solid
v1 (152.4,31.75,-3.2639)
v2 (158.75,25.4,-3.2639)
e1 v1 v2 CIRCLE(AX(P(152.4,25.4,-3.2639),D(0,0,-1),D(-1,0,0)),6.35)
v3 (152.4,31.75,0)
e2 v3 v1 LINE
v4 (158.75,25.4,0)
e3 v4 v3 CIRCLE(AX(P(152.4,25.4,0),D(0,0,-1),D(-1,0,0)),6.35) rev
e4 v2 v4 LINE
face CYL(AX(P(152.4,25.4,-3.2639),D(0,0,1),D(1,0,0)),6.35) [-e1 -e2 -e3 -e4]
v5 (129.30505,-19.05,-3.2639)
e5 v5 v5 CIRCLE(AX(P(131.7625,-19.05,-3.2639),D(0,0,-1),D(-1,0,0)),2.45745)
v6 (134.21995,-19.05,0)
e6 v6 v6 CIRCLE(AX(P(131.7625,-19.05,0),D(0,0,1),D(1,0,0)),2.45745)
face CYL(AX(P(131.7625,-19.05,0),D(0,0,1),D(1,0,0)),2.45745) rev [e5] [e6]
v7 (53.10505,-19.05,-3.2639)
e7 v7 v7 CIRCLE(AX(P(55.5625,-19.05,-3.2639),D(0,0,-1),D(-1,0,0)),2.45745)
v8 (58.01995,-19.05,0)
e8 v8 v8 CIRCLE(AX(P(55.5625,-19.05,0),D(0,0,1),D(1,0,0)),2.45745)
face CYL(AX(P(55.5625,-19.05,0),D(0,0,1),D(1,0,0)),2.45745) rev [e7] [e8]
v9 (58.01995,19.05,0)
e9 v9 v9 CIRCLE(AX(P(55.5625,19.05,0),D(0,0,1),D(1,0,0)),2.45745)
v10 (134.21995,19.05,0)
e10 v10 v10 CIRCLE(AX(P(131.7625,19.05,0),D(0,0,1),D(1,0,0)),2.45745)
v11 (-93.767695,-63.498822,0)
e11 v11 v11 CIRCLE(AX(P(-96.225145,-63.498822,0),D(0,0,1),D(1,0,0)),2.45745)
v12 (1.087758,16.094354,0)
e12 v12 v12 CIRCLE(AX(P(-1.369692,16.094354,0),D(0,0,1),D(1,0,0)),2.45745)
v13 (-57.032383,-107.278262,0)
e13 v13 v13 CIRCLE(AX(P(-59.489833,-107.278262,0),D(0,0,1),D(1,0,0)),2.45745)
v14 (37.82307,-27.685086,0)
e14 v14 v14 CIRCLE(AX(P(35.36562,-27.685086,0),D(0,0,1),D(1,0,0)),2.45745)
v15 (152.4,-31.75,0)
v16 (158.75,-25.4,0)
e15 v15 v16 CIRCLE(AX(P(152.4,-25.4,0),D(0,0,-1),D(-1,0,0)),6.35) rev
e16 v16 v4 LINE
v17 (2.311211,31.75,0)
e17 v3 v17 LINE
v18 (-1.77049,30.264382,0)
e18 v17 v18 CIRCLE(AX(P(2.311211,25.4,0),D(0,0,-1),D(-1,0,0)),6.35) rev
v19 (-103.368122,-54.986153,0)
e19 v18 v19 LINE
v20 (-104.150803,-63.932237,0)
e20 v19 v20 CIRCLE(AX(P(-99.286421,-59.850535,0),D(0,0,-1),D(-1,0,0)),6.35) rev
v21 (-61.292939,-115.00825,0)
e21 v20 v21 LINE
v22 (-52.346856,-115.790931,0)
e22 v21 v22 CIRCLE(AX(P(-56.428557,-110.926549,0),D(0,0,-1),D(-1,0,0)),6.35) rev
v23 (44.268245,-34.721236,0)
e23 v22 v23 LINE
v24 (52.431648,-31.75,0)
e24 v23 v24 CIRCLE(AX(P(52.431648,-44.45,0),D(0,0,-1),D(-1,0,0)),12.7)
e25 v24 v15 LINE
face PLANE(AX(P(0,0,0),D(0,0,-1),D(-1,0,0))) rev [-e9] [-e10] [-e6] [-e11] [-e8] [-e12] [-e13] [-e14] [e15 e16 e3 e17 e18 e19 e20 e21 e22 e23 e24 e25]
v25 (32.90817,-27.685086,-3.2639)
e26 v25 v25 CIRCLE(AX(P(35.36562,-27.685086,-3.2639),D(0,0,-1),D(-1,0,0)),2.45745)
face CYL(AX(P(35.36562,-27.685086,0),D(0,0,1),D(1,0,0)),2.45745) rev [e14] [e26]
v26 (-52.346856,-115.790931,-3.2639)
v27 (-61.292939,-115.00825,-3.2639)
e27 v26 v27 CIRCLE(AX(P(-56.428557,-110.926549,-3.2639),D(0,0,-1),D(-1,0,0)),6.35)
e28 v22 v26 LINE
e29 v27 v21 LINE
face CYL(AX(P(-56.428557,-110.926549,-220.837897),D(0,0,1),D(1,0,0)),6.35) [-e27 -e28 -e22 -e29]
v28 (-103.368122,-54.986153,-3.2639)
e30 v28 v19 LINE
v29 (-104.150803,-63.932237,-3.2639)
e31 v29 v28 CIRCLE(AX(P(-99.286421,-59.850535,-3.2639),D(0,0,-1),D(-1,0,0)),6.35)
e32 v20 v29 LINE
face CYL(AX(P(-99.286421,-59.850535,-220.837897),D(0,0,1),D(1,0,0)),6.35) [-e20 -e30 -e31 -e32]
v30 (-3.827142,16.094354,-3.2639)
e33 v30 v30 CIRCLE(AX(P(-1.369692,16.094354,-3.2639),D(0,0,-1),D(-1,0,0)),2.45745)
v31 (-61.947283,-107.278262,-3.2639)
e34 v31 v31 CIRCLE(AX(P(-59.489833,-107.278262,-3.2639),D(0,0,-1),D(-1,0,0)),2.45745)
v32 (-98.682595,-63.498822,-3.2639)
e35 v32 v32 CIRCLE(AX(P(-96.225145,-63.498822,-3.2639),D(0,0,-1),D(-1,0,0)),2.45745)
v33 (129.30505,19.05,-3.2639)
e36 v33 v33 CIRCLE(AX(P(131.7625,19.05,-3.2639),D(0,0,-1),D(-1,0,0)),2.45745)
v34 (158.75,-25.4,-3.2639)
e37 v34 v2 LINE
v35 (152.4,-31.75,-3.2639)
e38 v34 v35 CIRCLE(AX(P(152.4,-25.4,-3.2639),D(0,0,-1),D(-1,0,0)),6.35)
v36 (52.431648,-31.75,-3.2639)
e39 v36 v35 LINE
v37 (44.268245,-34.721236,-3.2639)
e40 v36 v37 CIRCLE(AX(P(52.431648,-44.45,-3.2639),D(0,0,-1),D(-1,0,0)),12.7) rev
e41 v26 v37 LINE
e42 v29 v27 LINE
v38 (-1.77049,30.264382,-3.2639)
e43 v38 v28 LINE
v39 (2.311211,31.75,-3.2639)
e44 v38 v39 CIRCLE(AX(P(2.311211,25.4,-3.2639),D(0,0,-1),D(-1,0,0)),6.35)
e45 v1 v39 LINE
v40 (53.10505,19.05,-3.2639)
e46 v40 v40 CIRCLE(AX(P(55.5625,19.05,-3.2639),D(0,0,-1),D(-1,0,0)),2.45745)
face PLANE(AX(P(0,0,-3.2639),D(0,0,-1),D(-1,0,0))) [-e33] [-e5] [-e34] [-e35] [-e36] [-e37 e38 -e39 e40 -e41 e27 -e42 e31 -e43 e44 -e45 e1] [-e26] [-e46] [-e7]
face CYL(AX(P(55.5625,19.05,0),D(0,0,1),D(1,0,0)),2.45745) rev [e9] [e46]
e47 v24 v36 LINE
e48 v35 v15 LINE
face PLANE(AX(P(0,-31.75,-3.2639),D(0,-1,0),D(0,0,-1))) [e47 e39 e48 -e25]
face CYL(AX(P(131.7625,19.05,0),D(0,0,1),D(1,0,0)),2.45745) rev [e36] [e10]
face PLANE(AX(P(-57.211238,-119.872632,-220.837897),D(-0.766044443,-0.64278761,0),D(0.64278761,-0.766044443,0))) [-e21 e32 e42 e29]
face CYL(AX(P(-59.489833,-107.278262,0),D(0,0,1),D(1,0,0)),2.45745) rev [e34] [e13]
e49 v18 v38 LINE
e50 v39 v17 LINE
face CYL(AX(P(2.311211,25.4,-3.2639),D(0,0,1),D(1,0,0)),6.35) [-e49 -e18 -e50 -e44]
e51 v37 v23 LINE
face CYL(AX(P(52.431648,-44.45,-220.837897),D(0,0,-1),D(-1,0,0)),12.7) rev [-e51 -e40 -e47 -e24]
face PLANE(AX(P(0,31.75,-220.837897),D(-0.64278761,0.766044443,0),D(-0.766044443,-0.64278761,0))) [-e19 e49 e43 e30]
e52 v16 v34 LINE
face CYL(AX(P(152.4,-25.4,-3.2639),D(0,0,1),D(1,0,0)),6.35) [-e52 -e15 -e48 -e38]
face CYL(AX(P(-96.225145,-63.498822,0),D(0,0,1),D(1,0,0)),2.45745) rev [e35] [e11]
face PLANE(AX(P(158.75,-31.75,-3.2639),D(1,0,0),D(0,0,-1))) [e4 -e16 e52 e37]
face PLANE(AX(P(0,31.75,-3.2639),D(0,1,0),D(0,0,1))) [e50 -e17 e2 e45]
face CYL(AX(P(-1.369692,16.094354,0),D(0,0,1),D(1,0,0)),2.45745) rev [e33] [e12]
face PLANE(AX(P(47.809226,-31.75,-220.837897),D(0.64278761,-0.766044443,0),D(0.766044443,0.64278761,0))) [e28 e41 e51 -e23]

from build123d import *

# Parameters (mm, degrees)
SKETCH1_W                    = 158.75
SKETCH1_H                    = 63.5
BASE_FLANGE1_DEPTH           = 3.2639
F_10_0_1935_DIAMETER_HOLE1_D = 4.9149
BOSS_EXTRUDE1_DEPTH          = 3.2639
F_10_0_1935_DIAMETER_HOLE2_D = 4.9149
FILLET1_R                    = 6.35
FILLET2_R                    = 12.7


# Sheet-metal steps are written as plain solids
with BuildPart() as part:
    # Sketch1 → Base-Flange1 (new body)
    with BuildSketch(Plane.XY):
        with Locations((79.375, 0)):
            Rectangle(SKETCH1_W, SKETCH1_H)
    extrude(amount=-BASE_FLANGE1_DEPTH)

    # #10 (0.1935) Diameter Hole1 (through all)
    with Locations(Plane.XY):
        with Locations((55.5625, 19.05), (55.5625, -19.05), (131.7625, 19.05), (131.7625, -19.05)):
            Hole(F_10_0_1935_DIAMETER_HOLE1_D / 2)

    # Sketch8 → Boss-Extrude1 (add)
    with BuildSketch(Plane.XY):
        Polygon((0, 31.75), (-108.232504257, -59.067854404), (-57.211237738, -119.872632076), (47.809225627, -31.75), (0, -31.75), align=None)
    extrude(amount=-BOSS_EXTRUDE1_DEPTH)

    # #10 (0.1935) Diameter Hole2 (through all)
    with Locations(Plane.XY):
        with Locations((-1.369691562, 16.094353813), (-96.225144731, -63.498821956), (35.365620332, -27.685086111), (-59.489832837, -107.27826188)):
            Hole(F_10_0_1935_DIAMETER_HOLE2_D / 2)

    # Fillet1
    fillet1_edges = [part.edges().sort_by_distance(p)[0] for p in [
        (-108.232504257, -59.067854404, -1.63195),
        (-57.211237738, -119.872632076, -1.63195),
        (0, 31.75, -1.63195),
        (158.75, 31.75, -1.63195),
        (158.75, -31.75, -1.63195),
    ]]
    fillet(fillet1_edges, radius=FILLET1_R)

    # Fillet2
    fillet2_edges = [part.edges().sort_by_distance(p)[0] for p in [
        (47.809225627, -31.75, -1.63195),
    ]]
    fillet(fillet2_edges, radius=FILLET2_R)


solid = part.part
